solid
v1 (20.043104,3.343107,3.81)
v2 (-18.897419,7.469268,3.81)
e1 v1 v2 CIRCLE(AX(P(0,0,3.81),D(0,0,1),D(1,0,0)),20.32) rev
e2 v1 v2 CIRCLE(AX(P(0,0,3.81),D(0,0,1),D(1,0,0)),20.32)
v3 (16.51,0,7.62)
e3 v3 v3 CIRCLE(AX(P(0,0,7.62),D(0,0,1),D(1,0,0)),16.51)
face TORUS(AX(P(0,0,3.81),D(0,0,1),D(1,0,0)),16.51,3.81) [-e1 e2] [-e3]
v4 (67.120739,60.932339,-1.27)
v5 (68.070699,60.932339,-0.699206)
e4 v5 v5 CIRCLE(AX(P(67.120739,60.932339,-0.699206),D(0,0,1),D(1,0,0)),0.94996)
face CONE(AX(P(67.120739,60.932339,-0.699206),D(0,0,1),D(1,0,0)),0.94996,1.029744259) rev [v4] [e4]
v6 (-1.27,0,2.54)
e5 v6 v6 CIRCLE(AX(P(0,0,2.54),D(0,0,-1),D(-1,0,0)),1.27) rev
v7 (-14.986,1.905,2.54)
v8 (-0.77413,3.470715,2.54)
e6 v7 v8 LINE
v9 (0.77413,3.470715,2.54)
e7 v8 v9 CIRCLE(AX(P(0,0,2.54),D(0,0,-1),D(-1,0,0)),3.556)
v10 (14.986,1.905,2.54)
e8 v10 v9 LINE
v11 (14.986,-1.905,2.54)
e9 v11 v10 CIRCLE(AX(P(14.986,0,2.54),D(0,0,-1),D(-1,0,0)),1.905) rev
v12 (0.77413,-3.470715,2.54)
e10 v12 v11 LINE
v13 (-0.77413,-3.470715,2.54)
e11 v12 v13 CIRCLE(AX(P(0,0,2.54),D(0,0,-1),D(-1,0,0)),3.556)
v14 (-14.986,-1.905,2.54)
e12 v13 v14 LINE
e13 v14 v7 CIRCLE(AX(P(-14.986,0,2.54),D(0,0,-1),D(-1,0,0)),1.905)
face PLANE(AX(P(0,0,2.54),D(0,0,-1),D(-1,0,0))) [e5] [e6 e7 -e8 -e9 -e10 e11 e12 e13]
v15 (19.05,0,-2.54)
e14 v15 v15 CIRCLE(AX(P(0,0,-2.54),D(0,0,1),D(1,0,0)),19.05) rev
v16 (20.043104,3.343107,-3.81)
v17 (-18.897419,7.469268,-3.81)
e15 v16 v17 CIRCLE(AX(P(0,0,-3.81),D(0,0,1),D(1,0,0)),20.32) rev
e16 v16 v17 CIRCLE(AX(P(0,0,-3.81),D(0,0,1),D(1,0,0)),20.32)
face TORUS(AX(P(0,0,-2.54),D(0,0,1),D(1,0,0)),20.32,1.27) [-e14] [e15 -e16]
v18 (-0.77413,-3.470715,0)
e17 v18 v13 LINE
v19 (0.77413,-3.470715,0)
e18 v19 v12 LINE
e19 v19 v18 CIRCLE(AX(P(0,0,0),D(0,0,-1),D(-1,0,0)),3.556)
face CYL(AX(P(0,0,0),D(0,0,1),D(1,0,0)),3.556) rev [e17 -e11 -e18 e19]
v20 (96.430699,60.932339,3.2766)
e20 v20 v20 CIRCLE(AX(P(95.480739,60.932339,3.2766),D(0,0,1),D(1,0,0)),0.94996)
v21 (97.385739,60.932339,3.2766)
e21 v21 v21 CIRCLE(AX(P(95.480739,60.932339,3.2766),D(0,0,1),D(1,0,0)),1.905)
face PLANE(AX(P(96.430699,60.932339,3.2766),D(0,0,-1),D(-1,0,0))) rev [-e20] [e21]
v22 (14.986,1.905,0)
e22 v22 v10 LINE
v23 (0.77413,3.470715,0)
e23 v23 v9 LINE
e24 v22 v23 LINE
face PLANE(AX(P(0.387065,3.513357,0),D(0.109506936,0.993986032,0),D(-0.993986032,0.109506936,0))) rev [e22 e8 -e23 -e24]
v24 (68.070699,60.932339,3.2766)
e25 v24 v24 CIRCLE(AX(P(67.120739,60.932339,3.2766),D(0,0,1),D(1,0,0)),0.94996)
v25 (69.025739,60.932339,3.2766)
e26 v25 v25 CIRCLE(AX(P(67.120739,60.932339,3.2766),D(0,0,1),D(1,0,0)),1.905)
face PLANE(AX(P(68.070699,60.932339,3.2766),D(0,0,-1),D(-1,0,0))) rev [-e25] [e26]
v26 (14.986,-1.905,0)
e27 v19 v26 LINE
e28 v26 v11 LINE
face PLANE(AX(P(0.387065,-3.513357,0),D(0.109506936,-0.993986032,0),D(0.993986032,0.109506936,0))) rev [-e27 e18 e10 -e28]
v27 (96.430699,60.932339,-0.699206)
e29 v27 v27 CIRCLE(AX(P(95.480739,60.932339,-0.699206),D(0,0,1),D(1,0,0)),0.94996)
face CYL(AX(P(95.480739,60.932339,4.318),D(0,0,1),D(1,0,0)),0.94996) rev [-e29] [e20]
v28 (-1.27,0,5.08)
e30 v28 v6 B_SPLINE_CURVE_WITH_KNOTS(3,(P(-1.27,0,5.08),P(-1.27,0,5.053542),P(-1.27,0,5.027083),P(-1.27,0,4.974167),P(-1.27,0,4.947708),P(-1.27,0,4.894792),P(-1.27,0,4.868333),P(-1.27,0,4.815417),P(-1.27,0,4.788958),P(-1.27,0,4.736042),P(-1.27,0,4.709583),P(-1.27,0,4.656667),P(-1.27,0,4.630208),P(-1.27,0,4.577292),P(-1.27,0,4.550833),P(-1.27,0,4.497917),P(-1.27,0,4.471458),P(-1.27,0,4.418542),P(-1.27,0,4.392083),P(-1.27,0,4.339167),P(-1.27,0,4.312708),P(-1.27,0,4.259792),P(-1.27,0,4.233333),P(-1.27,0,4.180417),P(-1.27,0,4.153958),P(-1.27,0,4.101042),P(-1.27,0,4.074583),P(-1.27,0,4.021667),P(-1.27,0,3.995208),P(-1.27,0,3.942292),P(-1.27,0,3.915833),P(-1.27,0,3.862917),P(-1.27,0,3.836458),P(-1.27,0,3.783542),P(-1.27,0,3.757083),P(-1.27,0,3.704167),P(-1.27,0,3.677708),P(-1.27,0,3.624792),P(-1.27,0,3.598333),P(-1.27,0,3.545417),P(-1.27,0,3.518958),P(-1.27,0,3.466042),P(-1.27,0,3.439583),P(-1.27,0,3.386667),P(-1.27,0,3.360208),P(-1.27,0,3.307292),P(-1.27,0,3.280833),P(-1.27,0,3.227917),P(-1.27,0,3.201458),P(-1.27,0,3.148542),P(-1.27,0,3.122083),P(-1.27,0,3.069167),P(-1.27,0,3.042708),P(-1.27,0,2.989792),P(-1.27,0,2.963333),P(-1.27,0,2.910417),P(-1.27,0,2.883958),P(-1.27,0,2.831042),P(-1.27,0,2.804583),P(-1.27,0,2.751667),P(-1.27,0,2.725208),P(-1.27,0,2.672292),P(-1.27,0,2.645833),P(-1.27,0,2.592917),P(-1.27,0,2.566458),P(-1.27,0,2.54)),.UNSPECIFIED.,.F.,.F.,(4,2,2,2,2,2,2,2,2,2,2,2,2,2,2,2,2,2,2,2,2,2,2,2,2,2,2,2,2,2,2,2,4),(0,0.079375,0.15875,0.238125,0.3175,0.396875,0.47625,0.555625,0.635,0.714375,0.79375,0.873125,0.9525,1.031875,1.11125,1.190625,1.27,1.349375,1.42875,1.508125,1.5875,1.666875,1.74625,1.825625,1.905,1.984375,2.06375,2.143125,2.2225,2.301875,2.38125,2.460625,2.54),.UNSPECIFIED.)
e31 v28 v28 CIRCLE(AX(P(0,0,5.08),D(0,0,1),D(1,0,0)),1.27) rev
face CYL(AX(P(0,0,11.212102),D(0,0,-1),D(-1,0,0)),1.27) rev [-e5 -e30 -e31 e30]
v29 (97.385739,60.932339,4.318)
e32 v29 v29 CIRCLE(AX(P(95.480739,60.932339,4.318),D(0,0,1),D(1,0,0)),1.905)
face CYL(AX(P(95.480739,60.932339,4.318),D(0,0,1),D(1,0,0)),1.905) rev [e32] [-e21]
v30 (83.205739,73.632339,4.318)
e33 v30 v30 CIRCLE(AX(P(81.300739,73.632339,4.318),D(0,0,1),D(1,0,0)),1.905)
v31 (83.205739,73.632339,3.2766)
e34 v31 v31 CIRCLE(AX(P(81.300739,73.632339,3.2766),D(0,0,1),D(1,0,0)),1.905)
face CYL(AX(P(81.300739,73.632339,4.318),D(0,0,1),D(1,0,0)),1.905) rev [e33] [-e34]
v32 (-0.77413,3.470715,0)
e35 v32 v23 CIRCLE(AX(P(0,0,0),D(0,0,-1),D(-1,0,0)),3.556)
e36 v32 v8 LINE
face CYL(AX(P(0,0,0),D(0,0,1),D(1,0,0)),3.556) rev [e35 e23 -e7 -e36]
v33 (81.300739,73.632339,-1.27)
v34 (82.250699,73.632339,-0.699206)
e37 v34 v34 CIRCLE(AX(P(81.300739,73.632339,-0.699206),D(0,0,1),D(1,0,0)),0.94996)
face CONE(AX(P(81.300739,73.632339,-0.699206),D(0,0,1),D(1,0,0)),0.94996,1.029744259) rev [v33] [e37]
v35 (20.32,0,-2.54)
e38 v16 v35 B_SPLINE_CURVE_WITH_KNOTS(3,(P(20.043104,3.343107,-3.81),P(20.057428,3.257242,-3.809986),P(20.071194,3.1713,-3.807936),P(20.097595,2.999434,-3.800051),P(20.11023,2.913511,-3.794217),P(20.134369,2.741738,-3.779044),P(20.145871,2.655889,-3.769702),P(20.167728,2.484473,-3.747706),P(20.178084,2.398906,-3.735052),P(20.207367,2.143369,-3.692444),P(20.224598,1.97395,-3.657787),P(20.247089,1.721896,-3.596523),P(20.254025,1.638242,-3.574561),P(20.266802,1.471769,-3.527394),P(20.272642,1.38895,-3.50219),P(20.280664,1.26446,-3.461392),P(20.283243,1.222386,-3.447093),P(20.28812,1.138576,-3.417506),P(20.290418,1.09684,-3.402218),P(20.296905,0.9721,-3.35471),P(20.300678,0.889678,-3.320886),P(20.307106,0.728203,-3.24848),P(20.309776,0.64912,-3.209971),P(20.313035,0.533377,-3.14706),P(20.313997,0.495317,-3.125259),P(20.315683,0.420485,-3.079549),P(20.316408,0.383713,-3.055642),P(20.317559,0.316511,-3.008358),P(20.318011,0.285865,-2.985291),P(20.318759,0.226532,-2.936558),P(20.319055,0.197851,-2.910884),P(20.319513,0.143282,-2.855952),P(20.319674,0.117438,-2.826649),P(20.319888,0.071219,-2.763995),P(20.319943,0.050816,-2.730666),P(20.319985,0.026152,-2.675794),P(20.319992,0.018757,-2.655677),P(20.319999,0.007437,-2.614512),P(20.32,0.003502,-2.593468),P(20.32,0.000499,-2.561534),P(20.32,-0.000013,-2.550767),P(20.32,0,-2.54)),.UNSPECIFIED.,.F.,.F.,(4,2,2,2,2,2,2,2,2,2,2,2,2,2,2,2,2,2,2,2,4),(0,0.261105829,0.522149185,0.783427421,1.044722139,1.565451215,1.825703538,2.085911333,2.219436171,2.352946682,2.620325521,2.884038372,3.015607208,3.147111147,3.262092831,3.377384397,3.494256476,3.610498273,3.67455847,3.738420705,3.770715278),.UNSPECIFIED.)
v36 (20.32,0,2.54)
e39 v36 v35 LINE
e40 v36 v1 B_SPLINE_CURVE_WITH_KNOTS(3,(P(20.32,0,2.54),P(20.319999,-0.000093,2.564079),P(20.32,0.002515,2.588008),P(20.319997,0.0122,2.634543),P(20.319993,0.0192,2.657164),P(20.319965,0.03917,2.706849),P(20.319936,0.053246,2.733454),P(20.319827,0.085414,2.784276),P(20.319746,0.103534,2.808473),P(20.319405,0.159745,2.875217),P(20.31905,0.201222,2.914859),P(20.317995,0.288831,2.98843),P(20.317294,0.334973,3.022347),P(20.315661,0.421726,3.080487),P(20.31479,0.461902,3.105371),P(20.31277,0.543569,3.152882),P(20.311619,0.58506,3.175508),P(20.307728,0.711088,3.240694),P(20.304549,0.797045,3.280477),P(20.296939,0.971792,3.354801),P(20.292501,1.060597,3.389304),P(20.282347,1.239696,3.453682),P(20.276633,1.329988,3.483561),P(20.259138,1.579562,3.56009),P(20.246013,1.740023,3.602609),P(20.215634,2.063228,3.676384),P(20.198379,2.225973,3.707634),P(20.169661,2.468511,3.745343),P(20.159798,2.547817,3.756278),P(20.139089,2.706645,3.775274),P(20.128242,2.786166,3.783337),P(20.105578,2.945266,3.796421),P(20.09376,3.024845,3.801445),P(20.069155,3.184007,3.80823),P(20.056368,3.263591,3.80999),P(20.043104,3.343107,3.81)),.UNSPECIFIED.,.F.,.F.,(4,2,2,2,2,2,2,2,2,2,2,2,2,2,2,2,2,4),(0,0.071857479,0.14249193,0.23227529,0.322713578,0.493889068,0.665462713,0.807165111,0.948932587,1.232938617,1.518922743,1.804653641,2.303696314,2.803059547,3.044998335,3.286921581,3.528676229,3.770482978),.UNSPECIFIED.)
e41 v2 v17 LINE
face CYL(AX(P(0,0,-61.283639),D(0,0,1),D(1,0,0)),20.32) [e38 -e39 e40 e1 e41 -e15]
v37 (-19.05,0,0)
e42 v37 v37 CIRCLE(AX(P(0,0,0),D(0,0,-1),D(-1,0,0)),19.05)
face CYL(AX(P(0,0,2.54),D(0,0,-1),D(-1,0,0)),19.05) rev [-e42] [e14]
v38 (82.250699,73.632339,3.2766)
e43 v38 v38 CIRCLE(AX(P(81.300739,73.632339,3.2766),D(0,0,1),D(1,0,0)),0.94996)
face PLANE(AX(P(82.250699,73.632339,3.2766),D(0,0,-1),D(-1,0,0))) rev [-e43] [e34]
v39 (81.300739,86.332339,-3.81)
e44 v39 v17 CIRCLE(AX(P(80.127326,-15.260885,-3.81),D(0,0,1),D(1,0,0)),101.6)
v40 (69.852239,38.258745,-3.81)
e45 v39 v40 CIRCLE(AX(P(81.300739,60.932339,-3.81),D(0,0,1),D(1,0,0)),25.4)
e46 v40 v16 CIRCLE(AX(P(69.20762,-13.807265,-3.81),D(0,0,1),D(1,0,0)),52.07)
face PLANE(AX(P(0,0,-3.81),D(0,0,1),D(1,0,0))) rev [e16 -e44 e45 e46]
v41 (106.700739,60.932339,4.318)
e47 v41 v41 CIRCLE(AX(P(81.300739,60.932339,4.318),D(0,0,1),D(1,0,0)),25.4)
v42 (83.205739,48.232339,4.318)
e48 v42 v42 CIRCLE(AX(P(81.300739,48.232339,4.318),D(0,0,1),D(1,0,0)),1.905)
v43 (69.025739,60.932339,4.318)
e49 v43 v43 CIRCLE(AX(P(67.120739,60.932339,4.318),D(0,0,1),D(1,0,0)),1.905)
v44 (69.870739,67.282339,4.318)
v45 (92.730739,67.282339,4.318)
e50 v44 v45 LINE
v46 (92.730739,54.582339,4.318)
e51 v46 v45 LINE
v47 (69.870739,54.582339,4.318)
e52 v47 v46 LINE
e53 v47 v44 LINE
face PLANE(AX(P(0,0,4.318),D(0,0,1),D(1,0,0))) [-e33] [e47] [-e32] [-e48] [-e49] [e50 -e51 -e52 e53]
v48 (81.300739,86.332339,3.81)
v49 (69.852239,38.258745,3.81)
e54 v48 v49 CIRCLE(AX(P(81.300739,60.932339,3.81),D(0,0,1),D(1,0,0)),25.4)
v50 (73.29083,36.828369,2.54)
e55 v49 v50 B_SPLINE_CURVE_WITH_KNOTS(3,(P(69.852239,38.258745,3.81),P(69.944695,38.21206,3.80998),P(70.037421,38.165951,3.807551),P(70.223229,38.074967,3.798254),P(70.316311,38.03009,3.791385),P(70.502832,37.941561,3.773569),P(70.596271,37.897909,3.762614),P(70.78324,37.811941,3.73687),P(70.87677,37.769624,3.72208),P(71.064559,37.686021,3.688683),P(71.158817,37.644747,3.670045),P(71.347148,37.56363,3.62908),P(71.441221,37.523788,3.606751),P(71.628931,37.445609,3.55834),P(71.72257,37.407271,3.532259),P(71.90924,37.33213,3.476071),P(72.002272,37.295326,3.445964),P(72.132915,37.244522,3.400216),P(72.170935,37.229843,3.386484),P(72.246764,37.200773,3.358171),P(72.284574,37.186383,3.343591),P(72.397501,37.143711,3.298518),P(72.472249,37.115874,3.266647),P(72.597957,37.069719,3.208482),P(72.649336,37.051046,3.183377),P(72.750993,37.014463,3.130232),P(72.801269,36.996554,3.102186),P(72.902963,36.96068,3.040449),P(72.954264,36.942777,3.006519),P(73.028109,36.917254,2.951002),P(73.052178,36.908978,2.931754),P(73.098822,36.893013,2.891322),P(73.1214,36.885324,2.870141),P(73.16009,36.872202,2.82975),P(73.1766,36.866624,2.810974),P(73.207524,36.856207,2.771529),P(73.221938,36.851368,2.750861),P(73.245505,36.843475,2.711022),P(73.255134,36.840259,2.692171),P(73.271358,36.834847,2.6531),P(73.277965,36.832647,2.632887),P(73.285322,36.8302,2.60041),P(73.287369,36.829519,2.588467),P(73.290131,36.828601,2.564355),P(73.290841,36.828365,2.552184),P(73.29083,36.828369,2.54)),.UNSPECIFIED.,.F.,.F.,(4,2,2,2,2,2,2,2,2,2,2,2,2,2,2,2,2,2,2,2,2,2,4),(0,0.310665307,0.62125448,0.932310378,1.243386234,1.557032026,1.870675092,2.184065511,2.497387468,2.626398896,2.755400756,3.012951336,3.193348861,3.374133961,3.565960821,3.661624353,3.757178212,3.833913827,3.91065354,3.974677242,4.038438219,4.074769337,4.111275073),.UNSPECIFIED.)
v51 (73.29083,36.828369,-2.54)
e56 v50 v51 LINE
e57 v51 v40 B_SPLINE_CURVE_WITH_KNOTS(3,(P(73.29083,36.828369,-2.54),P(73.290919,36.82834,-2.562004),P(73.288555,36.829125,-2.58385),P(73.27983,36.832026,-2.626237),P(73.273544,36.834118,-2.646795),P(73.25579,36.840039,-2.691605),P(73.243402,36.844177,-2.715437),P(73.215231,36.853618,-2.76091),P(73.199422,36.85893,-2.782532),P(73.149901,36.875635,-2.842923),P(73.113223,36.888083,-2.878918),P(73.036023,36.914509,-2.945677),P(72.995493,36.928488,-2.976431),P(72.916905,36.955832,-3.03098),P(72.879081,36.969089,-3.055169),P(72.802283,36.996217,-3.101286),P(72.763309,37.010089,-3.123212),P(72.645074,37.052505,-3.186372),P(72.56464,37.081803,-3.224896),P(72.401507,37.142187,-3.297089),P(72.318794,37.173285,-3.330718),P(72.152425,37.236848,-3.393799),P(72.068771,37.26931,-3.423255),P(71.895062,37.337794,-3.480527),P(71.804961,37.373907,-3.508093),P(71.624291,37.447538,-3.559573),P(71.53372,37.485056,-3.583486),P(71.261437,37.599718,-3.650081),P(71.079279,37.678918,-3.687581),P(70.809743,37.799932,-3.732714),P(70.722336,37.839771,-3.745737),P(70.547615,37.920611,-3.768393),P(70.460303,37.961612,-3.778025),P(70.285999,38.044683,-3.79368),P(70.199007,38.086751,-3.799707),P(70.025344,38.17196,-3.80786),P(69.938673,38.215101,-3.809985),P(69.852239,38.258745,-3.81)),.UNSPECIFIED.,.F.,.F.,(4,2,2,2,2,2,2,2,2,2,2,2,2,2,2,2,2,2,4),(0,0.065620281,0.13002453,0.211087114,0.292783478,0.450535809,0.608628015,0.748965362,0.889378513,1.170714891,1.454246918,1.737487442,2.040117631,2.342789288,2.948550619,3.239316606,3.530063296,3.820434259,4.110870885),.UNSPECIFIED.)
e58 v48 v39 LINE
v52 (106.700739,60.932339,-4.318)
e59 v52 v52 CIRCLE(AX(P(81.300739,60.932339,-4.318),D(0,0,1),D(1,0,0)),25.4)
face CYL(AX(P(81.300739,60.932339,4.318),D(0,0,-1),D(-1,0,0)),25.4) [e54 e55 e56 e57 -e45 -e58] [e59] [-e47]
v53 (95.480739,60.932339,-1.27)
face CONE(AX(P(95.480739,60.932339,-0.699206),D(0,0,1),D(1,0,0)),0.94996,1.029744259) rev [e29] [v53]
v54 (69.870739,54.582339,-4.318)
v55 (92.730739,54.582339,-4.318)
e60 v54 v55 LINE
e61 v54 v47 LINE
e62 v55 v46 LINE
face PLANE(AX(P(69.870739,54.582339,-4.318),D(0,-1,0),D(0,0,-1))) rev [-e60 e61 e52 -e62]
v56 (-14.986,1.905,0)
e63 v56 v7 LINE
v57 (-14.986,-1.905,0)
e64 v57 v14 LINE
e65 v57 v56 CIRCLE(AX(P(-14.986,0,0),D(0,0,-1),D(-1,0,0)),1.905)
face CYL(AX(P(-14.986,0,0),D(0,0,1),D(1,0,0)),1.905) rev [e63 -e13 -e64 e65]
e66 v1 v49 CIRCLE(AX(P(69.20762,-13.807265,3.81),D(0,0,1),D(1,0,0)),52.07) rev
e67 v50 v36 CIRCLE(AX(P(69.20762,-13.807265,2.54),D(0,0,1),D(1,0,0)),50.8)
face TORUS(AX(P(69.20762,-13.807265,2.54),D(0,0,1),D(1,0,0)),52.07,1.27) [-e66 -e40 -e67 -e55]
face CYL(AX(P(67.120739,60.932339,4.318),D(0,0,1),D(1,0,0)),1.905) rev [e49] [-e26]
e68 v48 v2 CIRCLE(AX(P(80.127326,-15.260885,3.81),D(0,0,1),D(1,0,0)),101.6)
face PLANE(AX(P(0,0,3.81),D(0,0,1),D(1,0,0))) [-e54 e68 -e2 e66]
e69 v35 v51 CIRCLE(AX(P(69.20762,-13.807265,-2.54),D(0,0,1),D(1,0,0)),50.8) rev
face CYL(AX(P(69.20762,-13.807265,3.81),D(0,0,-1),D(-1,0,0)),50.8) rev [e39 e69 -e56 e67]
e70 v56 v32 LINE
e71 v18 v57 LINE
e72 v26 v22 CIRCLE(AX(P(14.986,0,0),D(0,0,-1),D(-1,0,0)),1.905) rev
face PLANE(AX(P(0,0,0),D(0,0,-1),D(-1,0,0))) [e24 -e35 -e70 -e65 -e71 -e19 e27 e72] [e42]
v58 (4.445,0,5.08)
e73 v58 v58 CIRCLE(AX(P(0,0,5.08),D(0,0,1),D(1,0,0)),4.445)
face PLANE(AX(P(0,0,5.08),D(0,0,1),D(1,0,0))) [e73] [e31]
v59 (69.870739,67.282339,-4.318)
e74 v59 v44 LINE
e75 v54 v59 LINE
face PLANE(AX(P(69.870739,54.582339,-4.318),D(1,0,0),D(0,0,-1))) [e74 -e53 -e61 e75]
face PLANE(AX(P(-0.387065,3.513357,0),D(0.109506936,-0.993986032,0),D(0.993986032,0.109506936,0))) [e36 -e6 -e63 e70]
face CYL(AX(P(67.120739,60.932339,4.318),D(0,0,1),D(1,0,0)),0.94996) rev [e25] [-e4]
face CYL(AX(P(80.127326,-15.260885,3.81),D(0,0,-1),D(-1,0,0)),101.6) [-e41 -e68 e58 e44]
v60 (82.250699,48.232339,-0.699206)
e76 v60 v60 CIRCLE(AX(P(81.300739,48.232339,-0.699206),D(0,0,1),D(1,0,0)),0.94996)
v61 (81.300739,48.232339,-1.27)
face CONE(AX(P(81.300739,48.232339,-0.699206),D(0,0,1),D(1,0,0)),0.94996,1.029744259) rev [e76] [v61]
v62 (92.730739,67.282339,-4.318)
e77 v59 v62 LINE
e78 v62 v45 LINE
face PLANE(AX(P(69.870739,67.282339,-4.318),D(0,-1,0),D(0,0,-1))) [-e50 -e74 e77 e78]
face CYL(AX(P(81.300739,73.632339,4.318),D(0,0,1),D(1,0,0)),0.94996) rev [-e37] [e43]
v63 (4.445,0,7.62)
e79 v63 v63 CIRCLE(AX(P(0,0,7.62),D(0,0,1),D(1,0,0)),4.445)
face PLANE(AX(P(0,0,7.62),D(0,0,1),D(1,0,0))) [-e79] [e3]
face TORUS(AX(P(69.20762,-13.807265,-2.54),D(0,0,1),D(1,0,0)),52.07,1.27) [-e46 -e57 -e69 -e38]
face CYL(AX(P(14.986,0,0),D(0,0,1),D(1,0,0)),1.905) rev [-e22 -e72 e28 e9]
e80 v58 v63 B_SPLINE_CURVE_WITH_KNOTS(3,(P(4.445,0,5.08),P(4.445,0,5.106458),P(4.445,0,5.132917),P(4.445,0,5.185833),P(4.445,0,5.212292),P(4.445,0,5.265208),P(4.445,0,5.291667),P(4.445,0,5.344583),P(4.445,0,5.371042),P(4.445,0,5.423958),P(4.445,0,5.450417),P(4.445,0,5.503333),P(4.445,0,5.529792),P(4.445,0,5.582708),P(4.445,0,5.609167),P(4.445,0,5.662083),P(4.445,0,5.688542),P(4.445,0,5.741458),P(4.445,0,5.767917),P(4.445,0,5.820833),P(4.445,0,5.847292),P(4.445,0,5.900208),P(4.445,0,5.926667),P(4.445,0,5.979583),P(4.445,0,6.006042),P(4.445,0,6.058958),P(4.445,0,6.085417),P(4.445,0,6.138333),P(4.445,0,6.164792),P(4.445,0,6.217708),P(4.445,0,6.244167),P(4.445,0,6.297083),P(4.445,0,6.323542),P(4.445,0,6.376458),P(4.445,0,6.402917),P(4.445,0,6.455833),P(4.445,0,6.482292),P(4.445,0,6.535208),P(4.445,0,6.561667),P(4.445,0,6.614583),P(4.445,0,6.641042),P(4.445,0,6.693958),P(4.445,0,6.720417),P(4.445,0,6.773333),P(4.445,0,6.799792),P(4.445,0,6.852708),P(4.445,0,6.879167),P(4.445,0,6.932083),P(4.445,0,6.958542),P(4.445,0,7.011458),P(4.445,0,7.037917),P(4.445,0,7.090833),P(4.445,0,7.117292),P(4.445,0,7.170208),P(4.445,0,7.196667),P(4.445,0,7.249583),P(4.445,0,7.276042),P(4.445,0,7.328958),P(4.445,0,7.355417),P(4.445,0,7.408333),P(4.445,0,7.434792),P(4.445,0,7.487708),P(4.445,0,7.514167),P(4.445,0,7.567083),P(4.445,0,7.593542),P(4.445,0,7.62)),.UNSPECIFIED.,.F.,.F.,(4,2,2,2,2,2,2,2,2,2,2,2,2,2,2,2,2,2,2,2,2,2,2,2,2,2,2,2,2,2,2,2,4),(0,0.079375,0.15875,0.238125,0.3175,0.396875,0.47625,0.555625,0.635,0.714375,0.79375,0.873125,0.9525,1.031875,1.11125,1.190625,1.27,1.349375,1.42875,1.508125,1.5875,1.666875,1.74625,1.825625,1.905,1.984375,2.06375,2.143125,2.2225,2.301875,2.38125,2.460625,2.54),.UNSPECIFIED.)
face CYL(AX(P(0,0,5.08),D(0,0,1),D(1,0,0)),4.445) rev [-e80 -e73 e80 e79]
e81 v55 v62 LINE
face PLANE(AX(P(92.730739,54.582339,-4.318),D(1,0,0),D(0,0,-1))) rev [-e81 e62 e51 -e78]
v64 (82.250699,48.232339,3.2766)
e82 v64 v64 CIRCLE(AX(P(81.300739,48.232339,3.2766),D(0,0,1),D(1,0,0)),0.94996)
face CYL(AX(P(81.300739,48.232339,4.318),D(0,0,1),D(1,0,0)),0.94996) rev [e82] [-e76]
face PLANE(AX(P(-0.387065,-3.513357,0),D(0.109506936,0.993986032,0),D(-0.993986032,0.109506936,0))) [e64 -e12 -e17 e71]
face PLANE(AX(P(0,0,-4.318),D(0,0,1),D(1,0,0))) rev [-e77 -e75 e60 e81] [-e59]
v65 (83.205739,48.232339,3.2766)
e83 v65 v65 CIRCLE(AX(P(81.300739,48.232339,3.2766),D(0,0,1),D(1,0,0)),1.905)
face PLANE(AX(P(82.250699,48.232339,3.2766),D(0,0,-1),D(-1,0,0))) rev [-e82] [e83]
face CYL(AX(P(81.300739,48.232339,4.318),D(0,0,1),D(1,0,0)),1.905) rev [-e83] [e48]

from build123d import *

# Parameters (mm, degrees)
BOSS_EXTRUDE3_DEPTH                                 = 3.81
BOSS_EXTRUDE4_DEPTH                                 = 7.62
BOSS_EXTRUDE4_DEPTH_BACK                            = 3.81
SKETCH1_6_R                                         = 20.32
SKETCH1_7_R                                         = 25.4
BOSS_EXTRUDE5_DEPTH                                 = 4.318
SKETCH3_R                                           = 1.27
CUT_EXTRUDE1_DEPTH                                  = 11.43
SKETCH4_R                                           = 4.445
CUT_EXTRUDE2_DEPTH                                  = 2.54
FILLET1_R                                           = 3.81
SKETCH5_R                                           = 19.05
CUT_EXTRUDE3_DEPTH                                  = 6.35
SKETCH6_W                                           = 22.86
SKETCH6_H                                           = 12.7
CUT_EXTRUDE4_DEPTH                                  = 138.528436683
FILLET8_R                                           = 1.27
FILLET9_R                                           = 1.27
CBORE_FOR_1_BINDING_HEAD_MACHINE_SCREW3_D           = 1.89992
CBORE_FOR_1_BINDING_HEAD_MACHINE_SCREW3_DEPTH       = 5.017206446
CBORE_FOR_1_BINDING_HEAD_MACHINE_SCREW3_CBORE_D     = 3.81
CBORE_FOR_1_BINDING_HEAD_MACHINE_SCREW3_CBORE_DEPTH = 1.0414
CBORE_FOR_1_BINDING_HEAD_MACHINE_SCREW3_TIP         = 0.570793554
BOSS_EXTRUDE6_START                                 = 2.54
SKETCH17_R                                          = 19.05
BOSS_EXTRUDE6_DEPTH                                 = 2.54


# Read off the part's stored shape, not the designer's step: CBORE for #1 Binding Head Machine Screw4
# Some blends are built 0.0001 mm under size
with BuildPart() as part:
    # Sketch1 → Boss-Extrude3 (new, symmetric)
    with BuildSketch(Plane.XY):
        with BuildLine():
            ThreePointArc((-18.897418568, 7.46926847), (3.801766346, 19.961186654), (20.32, 0))
            ThreePointArc((20.32, 0), (40.208637995, 27.902434348), (73.290830481, 36.828368704))
            ThreePointArc((73.290830481, 36.828368704), (56.22683941, 64.989379592), (81.300738581, 86.332338755))
            ThreePointArc((81.300738581, 86.332338755), (17.289703956, 64.576407081), (-18.897418568, 7.46926847))
        make_face()
    extrude(amount=BOSS_EXTRUDE3_DEPTH, both=True)

    # Sketch1<6> → Boss-Extrude4 (add, two sides: drawn at the far end of the back side and taken through both)
    with BuildSketch(Plane.XY.offset(-BOSS_EXTRUDE4_DEPTH_BACK)):
        Circle(SKETCH1_6_R)
    extrude(amount=BOSS_EXTRUDE4_DEPTH + BOSS_EXTRUDE4_DEPTH_BACK)

    # Sketch1<7> → Boss-Extrude5 (add, symmetric)
    with BuildSketch(Plane.XY):
        with Locations((81.300738581, 60.932338755)):
            Circle(SKETCH1_7_R)
    extrude(amount=BOSS_EXTRUDE5_DEPTH, both=True)

    # Sketch3 → Cut-Extrude1 (cut)
    with BuildSketch(Plane(origin=(0, 0, -3.81), x_dir=(-1, 0, 0), z_dir=(0, 0, -1))):
        Circle(SKETCH3_R)
    extrude(amount=-CUT_EXTRUDE1_DEPTH, mode=Mode.SUBTRACT)

    # Sketch4 → Cut-Extrude2 (cut)
    with BuildSketch(Plane.XY.offset(7.62)):
        Circle(SKETCH4_R)
    extrude(amount=-CUT_EXTRUDE2_DEPTH, mode=Mode.SUBTRACT)

    # Fillet1
    fillet1_edges = [part.edges().sort_by_distance(p)[0] for p in [
        (-20.32, 0, 7.62),
    ]]
    fillet(fillet1_edges, radius=FILLET1_R - 0.0001)  # a hair under: the kernel refuses the full size

    # Sketch5 → Cut-Extrude3 (cut)
    with BuildSketch(Plane(origin=(0, 0, -3.81), x_dir=(-1, 0, 0), z_dir=(0, 0, -1))):
        Circle(SKETCH5_R)
    extrude(amount=-CUT_EXTRUDE3_DEPTH, mode=Mode.SUBTRACT)

    # Sketch6 → Cut-Extrude4 (cut, through all)
    with BuildSketch(Plane.XY.offset(4.318)):
        with Locations((81.300738581, 60.932338755)):
            Rectangle(SKETCH6_W, SKETCH6_H)
    extrude(amount=-CUT_EXTRUDE4_DEPTH, mode=Mode.SUBTRACT)

    # Fillet8
    # the kernel refuses this fillet: 1.27 mm, written as the material it takes off along each edge
    with BuildSketch(Plane(origin=(69.207620463, -13.807264954, 3.81), x_dir=(-0.9774560412595347, 0.21113902388056724, 0), z_dir=(-0.21113902388056724, -0.9774560412595347, 0))) as fillet8_piece_1_section:
        with BuildLine():
            CenterArc((50.8 + FILLET8_R, FILLET8_R), FILLET8_R, 180, 90)
            Line((50.8, FILLET8_R), (50.8, 0))
            Line((50.8, 0), (50.8 + FILLET8_R, 0))
        make_face()
    fillet8_piece_1 = revolve(axis=Axis((69.207620463, -13.807264954, 3.81), (0, 0, -1)), revolution_arc=86.003281832, mode=Mode.PRIVATE)
    fillet8_piece_1 = fillet8_piece_1 - Plane(origin=(0, 0, 3.45954073), x_dir=(1, 0, 0), z_dir=(0, 0, -1)) * Cylinder(20.32, 209, mode=Mode.PRIVATE)
    fillet8_piece_1 = fillet8_piece_1 - Plane(origin=(81.300738581, 60.932338755, 3.45954073), x_dir=(1, 0, 0), z_dir=(0, 0, 1)) * Cylinder(25.4, 209, mode=Mode.PRIVATE)
    add(fillet8_piece_1, mode=Mode.SUBTRACT)
    with BuildSketch(Plane(origin=(69.207620463, -13.807264954, -3.81), x_dir=(-0.9774560412595347, 0.21113902388056724, 0), z_dir=(-0.21113902388056724, -0.9774560412595347, 0))) as fillet8_piece_2_section:
        with BuildLine():
            CenterArc((50.8 + FILLET8_R, -FILLET8_R), FILLET8_R, 90, 90)
            Line((50.8 + FILLET8_R, 0), (50.8, 0))
            Line((50.8, 0), (50.8, -FILLET8_R))
        make_face()
    fillet8_piece_2 = revolve(axis=Axis((69.207620463, -13.807264954, -3.81), (0, 0, -1)), revolution_arc=86.003281832, mode=Mode.PRIVATE)
    fillet8_piece_2 = fillet8_piece_2 - Plane(origin=(0, 0, -3.459540406), x_dir=(1, 0, 0), z_dir=(0, 0, -1)) * Cylinder(20.32, 209, mode=Mode.PRIVATE)
    fillet8_piece_2 = fillet8_piece_2 - Plane(origin=(81.300738581, 60.932338755, -3.459540406), x_dir=(1, 0, 0), z_dir=(0, 0, 1)) * Cylinder(25.4, 209, mode=Mode.PRIVATE)
    add(fillet8_piece_2, mode=Mode.SUBTRACT)

    # Fillet9
    fillet9_edges = [part.edges().sort_by_distance(p)[0] for p in [
        (19.05, 0, -3.81),
    ]]
    fillet(fillet9_edges, radius=FILLET9_R - 0.0001)  # a hair under: the kernel refuses the full size

    # CBORE for #1 Binding Head Machine Screw3
    with Locations(Plane.XY.offset(4.318)):
        with Locations((81.300738581, 73.632338755), (81.300738581, 48.232338755)):
            CounterBoreHole(CBORE_FOR_1_BINDING_HEAD_MACHINE_SCREW3_D / 2, CBORE_FOR_1_BINDING_HEAD_MACHINE_SCREW3_CBORE_D / 2, CBORE_FOR_1_BINDING_HEAD_MACHINE_SCREW3_CBORE_DEPTH, depth=CBORE_FOR_1_BINDING_HEAD_MACHINE_SCREW3_DEPTH)
            with Locations((0, 0, -(CBORE_FOR_1_BINDING_HEAD_MACHINE_SCREW3_DEPTH + CBORE_FOR_1_BINDING_HEAD_MACHINE_SCREW3_TIP / 2))):  # 118° drill point
                Cone(0, CBORE_FOR_1_BINDING_HEAD_MACHINE_SCREW3_D / 2, CBORE_FOR_1_BINDING_HEAD_MACHINE_SCREW3_TIP, mode=Mode.SUBTRACT)

    # Sketch17 → Boss-Extrude6 (add)
    with BuildSketch(Plane(origin=(0, 0, 2.54), x_dir=(-1, 0, 0), z_dir=(0, 0, -1)).offset(BOSS_EXTRUDE6_START)):
        Circle(SKETCH17_R)
        with BuildLine():
            ThreePointArc((0.774129568, -3.470714539), (0.389406663, -3.534614328), (0, -3.556))
            ThreePointArc((0, -3.556), (-0.389406663, -3.534614328), (-0.774129568, -3.470714539))
            Line((-0.774129568, -3.470714539), (-14.986, -1.905))
            ThreePointArc((-14.986, -1.905), (-16.891, 0), (-14.986, 1.905))
            Line((-14.986, 1.905), (-0.774129568, 3.470714539))
            ThreePointArc((-0.774129568, 3.470714539), (-0.389406663, 3.534614328), (0, 3.556))
            ThreePointArc((0, 3.556), (0.389406663, 3.534614328), (0.774129568, 3.470714539))
            Line((0.774129568, 3.470714539), (14.986, 1.905))
            ThreePointArc((14.986, 1.905), (16.333038418, 1.347038418), (16.891, 0))
            ThreePointArc((16.891, 0), (16.333038418, -1.347038418), (14.986, -1.905))
            Line((14.986, -1.905), (0.774129568, -3.470714539))
        make_face(mode=Mode.SUBTRACT)
    extrude(amount=-BOSS_EXTRUDE6_DEPTH)

    # CBORE for _1 Binding Head Machine Sc 2 → CBORE for #1 Binding Head Machine Screw4 (revolve, cut)
    with BuildSketch(Plane(origin=(95.480738581, 60.932338755, 0), x_dir=(1, 0, 0), z_dir=(0, -1, 0))):
        Polygon((1.905, 4.318), (0, 4.318), (0, -1.27), (0.94996, -0.699206446), (0.94996, 3.2766), (1.905, 3.2766), align=None)
    revolve(axis=Axis((95.480738581, 60.932338755, 0), (0, 0, 1)), mode=Mode.SUBTRACT)

    # CBORE for _1 Binding Head Machine Sc 3 o → CBORE for _1 Binding Head Machine Sc 3 (revolve, cut)
    with BuildSketch(Plane(origin=(67.120738581, 60.932338755, 0), x_dir=(1, 0, 0), z_dir=(0, -1, 0))):
        Polygon((1.905, 4.318), (0, 4.318), (0, -1.27), (0.94996, -0.699206446), (0.94996, 3.2766), (1.905, 3.2766), align=None)
    revolve(axis=Axis((67.120738581, 60.932338755, 0), (0, 0, 1)), mode=Mode.SUBTRACT)


solid = part.part
